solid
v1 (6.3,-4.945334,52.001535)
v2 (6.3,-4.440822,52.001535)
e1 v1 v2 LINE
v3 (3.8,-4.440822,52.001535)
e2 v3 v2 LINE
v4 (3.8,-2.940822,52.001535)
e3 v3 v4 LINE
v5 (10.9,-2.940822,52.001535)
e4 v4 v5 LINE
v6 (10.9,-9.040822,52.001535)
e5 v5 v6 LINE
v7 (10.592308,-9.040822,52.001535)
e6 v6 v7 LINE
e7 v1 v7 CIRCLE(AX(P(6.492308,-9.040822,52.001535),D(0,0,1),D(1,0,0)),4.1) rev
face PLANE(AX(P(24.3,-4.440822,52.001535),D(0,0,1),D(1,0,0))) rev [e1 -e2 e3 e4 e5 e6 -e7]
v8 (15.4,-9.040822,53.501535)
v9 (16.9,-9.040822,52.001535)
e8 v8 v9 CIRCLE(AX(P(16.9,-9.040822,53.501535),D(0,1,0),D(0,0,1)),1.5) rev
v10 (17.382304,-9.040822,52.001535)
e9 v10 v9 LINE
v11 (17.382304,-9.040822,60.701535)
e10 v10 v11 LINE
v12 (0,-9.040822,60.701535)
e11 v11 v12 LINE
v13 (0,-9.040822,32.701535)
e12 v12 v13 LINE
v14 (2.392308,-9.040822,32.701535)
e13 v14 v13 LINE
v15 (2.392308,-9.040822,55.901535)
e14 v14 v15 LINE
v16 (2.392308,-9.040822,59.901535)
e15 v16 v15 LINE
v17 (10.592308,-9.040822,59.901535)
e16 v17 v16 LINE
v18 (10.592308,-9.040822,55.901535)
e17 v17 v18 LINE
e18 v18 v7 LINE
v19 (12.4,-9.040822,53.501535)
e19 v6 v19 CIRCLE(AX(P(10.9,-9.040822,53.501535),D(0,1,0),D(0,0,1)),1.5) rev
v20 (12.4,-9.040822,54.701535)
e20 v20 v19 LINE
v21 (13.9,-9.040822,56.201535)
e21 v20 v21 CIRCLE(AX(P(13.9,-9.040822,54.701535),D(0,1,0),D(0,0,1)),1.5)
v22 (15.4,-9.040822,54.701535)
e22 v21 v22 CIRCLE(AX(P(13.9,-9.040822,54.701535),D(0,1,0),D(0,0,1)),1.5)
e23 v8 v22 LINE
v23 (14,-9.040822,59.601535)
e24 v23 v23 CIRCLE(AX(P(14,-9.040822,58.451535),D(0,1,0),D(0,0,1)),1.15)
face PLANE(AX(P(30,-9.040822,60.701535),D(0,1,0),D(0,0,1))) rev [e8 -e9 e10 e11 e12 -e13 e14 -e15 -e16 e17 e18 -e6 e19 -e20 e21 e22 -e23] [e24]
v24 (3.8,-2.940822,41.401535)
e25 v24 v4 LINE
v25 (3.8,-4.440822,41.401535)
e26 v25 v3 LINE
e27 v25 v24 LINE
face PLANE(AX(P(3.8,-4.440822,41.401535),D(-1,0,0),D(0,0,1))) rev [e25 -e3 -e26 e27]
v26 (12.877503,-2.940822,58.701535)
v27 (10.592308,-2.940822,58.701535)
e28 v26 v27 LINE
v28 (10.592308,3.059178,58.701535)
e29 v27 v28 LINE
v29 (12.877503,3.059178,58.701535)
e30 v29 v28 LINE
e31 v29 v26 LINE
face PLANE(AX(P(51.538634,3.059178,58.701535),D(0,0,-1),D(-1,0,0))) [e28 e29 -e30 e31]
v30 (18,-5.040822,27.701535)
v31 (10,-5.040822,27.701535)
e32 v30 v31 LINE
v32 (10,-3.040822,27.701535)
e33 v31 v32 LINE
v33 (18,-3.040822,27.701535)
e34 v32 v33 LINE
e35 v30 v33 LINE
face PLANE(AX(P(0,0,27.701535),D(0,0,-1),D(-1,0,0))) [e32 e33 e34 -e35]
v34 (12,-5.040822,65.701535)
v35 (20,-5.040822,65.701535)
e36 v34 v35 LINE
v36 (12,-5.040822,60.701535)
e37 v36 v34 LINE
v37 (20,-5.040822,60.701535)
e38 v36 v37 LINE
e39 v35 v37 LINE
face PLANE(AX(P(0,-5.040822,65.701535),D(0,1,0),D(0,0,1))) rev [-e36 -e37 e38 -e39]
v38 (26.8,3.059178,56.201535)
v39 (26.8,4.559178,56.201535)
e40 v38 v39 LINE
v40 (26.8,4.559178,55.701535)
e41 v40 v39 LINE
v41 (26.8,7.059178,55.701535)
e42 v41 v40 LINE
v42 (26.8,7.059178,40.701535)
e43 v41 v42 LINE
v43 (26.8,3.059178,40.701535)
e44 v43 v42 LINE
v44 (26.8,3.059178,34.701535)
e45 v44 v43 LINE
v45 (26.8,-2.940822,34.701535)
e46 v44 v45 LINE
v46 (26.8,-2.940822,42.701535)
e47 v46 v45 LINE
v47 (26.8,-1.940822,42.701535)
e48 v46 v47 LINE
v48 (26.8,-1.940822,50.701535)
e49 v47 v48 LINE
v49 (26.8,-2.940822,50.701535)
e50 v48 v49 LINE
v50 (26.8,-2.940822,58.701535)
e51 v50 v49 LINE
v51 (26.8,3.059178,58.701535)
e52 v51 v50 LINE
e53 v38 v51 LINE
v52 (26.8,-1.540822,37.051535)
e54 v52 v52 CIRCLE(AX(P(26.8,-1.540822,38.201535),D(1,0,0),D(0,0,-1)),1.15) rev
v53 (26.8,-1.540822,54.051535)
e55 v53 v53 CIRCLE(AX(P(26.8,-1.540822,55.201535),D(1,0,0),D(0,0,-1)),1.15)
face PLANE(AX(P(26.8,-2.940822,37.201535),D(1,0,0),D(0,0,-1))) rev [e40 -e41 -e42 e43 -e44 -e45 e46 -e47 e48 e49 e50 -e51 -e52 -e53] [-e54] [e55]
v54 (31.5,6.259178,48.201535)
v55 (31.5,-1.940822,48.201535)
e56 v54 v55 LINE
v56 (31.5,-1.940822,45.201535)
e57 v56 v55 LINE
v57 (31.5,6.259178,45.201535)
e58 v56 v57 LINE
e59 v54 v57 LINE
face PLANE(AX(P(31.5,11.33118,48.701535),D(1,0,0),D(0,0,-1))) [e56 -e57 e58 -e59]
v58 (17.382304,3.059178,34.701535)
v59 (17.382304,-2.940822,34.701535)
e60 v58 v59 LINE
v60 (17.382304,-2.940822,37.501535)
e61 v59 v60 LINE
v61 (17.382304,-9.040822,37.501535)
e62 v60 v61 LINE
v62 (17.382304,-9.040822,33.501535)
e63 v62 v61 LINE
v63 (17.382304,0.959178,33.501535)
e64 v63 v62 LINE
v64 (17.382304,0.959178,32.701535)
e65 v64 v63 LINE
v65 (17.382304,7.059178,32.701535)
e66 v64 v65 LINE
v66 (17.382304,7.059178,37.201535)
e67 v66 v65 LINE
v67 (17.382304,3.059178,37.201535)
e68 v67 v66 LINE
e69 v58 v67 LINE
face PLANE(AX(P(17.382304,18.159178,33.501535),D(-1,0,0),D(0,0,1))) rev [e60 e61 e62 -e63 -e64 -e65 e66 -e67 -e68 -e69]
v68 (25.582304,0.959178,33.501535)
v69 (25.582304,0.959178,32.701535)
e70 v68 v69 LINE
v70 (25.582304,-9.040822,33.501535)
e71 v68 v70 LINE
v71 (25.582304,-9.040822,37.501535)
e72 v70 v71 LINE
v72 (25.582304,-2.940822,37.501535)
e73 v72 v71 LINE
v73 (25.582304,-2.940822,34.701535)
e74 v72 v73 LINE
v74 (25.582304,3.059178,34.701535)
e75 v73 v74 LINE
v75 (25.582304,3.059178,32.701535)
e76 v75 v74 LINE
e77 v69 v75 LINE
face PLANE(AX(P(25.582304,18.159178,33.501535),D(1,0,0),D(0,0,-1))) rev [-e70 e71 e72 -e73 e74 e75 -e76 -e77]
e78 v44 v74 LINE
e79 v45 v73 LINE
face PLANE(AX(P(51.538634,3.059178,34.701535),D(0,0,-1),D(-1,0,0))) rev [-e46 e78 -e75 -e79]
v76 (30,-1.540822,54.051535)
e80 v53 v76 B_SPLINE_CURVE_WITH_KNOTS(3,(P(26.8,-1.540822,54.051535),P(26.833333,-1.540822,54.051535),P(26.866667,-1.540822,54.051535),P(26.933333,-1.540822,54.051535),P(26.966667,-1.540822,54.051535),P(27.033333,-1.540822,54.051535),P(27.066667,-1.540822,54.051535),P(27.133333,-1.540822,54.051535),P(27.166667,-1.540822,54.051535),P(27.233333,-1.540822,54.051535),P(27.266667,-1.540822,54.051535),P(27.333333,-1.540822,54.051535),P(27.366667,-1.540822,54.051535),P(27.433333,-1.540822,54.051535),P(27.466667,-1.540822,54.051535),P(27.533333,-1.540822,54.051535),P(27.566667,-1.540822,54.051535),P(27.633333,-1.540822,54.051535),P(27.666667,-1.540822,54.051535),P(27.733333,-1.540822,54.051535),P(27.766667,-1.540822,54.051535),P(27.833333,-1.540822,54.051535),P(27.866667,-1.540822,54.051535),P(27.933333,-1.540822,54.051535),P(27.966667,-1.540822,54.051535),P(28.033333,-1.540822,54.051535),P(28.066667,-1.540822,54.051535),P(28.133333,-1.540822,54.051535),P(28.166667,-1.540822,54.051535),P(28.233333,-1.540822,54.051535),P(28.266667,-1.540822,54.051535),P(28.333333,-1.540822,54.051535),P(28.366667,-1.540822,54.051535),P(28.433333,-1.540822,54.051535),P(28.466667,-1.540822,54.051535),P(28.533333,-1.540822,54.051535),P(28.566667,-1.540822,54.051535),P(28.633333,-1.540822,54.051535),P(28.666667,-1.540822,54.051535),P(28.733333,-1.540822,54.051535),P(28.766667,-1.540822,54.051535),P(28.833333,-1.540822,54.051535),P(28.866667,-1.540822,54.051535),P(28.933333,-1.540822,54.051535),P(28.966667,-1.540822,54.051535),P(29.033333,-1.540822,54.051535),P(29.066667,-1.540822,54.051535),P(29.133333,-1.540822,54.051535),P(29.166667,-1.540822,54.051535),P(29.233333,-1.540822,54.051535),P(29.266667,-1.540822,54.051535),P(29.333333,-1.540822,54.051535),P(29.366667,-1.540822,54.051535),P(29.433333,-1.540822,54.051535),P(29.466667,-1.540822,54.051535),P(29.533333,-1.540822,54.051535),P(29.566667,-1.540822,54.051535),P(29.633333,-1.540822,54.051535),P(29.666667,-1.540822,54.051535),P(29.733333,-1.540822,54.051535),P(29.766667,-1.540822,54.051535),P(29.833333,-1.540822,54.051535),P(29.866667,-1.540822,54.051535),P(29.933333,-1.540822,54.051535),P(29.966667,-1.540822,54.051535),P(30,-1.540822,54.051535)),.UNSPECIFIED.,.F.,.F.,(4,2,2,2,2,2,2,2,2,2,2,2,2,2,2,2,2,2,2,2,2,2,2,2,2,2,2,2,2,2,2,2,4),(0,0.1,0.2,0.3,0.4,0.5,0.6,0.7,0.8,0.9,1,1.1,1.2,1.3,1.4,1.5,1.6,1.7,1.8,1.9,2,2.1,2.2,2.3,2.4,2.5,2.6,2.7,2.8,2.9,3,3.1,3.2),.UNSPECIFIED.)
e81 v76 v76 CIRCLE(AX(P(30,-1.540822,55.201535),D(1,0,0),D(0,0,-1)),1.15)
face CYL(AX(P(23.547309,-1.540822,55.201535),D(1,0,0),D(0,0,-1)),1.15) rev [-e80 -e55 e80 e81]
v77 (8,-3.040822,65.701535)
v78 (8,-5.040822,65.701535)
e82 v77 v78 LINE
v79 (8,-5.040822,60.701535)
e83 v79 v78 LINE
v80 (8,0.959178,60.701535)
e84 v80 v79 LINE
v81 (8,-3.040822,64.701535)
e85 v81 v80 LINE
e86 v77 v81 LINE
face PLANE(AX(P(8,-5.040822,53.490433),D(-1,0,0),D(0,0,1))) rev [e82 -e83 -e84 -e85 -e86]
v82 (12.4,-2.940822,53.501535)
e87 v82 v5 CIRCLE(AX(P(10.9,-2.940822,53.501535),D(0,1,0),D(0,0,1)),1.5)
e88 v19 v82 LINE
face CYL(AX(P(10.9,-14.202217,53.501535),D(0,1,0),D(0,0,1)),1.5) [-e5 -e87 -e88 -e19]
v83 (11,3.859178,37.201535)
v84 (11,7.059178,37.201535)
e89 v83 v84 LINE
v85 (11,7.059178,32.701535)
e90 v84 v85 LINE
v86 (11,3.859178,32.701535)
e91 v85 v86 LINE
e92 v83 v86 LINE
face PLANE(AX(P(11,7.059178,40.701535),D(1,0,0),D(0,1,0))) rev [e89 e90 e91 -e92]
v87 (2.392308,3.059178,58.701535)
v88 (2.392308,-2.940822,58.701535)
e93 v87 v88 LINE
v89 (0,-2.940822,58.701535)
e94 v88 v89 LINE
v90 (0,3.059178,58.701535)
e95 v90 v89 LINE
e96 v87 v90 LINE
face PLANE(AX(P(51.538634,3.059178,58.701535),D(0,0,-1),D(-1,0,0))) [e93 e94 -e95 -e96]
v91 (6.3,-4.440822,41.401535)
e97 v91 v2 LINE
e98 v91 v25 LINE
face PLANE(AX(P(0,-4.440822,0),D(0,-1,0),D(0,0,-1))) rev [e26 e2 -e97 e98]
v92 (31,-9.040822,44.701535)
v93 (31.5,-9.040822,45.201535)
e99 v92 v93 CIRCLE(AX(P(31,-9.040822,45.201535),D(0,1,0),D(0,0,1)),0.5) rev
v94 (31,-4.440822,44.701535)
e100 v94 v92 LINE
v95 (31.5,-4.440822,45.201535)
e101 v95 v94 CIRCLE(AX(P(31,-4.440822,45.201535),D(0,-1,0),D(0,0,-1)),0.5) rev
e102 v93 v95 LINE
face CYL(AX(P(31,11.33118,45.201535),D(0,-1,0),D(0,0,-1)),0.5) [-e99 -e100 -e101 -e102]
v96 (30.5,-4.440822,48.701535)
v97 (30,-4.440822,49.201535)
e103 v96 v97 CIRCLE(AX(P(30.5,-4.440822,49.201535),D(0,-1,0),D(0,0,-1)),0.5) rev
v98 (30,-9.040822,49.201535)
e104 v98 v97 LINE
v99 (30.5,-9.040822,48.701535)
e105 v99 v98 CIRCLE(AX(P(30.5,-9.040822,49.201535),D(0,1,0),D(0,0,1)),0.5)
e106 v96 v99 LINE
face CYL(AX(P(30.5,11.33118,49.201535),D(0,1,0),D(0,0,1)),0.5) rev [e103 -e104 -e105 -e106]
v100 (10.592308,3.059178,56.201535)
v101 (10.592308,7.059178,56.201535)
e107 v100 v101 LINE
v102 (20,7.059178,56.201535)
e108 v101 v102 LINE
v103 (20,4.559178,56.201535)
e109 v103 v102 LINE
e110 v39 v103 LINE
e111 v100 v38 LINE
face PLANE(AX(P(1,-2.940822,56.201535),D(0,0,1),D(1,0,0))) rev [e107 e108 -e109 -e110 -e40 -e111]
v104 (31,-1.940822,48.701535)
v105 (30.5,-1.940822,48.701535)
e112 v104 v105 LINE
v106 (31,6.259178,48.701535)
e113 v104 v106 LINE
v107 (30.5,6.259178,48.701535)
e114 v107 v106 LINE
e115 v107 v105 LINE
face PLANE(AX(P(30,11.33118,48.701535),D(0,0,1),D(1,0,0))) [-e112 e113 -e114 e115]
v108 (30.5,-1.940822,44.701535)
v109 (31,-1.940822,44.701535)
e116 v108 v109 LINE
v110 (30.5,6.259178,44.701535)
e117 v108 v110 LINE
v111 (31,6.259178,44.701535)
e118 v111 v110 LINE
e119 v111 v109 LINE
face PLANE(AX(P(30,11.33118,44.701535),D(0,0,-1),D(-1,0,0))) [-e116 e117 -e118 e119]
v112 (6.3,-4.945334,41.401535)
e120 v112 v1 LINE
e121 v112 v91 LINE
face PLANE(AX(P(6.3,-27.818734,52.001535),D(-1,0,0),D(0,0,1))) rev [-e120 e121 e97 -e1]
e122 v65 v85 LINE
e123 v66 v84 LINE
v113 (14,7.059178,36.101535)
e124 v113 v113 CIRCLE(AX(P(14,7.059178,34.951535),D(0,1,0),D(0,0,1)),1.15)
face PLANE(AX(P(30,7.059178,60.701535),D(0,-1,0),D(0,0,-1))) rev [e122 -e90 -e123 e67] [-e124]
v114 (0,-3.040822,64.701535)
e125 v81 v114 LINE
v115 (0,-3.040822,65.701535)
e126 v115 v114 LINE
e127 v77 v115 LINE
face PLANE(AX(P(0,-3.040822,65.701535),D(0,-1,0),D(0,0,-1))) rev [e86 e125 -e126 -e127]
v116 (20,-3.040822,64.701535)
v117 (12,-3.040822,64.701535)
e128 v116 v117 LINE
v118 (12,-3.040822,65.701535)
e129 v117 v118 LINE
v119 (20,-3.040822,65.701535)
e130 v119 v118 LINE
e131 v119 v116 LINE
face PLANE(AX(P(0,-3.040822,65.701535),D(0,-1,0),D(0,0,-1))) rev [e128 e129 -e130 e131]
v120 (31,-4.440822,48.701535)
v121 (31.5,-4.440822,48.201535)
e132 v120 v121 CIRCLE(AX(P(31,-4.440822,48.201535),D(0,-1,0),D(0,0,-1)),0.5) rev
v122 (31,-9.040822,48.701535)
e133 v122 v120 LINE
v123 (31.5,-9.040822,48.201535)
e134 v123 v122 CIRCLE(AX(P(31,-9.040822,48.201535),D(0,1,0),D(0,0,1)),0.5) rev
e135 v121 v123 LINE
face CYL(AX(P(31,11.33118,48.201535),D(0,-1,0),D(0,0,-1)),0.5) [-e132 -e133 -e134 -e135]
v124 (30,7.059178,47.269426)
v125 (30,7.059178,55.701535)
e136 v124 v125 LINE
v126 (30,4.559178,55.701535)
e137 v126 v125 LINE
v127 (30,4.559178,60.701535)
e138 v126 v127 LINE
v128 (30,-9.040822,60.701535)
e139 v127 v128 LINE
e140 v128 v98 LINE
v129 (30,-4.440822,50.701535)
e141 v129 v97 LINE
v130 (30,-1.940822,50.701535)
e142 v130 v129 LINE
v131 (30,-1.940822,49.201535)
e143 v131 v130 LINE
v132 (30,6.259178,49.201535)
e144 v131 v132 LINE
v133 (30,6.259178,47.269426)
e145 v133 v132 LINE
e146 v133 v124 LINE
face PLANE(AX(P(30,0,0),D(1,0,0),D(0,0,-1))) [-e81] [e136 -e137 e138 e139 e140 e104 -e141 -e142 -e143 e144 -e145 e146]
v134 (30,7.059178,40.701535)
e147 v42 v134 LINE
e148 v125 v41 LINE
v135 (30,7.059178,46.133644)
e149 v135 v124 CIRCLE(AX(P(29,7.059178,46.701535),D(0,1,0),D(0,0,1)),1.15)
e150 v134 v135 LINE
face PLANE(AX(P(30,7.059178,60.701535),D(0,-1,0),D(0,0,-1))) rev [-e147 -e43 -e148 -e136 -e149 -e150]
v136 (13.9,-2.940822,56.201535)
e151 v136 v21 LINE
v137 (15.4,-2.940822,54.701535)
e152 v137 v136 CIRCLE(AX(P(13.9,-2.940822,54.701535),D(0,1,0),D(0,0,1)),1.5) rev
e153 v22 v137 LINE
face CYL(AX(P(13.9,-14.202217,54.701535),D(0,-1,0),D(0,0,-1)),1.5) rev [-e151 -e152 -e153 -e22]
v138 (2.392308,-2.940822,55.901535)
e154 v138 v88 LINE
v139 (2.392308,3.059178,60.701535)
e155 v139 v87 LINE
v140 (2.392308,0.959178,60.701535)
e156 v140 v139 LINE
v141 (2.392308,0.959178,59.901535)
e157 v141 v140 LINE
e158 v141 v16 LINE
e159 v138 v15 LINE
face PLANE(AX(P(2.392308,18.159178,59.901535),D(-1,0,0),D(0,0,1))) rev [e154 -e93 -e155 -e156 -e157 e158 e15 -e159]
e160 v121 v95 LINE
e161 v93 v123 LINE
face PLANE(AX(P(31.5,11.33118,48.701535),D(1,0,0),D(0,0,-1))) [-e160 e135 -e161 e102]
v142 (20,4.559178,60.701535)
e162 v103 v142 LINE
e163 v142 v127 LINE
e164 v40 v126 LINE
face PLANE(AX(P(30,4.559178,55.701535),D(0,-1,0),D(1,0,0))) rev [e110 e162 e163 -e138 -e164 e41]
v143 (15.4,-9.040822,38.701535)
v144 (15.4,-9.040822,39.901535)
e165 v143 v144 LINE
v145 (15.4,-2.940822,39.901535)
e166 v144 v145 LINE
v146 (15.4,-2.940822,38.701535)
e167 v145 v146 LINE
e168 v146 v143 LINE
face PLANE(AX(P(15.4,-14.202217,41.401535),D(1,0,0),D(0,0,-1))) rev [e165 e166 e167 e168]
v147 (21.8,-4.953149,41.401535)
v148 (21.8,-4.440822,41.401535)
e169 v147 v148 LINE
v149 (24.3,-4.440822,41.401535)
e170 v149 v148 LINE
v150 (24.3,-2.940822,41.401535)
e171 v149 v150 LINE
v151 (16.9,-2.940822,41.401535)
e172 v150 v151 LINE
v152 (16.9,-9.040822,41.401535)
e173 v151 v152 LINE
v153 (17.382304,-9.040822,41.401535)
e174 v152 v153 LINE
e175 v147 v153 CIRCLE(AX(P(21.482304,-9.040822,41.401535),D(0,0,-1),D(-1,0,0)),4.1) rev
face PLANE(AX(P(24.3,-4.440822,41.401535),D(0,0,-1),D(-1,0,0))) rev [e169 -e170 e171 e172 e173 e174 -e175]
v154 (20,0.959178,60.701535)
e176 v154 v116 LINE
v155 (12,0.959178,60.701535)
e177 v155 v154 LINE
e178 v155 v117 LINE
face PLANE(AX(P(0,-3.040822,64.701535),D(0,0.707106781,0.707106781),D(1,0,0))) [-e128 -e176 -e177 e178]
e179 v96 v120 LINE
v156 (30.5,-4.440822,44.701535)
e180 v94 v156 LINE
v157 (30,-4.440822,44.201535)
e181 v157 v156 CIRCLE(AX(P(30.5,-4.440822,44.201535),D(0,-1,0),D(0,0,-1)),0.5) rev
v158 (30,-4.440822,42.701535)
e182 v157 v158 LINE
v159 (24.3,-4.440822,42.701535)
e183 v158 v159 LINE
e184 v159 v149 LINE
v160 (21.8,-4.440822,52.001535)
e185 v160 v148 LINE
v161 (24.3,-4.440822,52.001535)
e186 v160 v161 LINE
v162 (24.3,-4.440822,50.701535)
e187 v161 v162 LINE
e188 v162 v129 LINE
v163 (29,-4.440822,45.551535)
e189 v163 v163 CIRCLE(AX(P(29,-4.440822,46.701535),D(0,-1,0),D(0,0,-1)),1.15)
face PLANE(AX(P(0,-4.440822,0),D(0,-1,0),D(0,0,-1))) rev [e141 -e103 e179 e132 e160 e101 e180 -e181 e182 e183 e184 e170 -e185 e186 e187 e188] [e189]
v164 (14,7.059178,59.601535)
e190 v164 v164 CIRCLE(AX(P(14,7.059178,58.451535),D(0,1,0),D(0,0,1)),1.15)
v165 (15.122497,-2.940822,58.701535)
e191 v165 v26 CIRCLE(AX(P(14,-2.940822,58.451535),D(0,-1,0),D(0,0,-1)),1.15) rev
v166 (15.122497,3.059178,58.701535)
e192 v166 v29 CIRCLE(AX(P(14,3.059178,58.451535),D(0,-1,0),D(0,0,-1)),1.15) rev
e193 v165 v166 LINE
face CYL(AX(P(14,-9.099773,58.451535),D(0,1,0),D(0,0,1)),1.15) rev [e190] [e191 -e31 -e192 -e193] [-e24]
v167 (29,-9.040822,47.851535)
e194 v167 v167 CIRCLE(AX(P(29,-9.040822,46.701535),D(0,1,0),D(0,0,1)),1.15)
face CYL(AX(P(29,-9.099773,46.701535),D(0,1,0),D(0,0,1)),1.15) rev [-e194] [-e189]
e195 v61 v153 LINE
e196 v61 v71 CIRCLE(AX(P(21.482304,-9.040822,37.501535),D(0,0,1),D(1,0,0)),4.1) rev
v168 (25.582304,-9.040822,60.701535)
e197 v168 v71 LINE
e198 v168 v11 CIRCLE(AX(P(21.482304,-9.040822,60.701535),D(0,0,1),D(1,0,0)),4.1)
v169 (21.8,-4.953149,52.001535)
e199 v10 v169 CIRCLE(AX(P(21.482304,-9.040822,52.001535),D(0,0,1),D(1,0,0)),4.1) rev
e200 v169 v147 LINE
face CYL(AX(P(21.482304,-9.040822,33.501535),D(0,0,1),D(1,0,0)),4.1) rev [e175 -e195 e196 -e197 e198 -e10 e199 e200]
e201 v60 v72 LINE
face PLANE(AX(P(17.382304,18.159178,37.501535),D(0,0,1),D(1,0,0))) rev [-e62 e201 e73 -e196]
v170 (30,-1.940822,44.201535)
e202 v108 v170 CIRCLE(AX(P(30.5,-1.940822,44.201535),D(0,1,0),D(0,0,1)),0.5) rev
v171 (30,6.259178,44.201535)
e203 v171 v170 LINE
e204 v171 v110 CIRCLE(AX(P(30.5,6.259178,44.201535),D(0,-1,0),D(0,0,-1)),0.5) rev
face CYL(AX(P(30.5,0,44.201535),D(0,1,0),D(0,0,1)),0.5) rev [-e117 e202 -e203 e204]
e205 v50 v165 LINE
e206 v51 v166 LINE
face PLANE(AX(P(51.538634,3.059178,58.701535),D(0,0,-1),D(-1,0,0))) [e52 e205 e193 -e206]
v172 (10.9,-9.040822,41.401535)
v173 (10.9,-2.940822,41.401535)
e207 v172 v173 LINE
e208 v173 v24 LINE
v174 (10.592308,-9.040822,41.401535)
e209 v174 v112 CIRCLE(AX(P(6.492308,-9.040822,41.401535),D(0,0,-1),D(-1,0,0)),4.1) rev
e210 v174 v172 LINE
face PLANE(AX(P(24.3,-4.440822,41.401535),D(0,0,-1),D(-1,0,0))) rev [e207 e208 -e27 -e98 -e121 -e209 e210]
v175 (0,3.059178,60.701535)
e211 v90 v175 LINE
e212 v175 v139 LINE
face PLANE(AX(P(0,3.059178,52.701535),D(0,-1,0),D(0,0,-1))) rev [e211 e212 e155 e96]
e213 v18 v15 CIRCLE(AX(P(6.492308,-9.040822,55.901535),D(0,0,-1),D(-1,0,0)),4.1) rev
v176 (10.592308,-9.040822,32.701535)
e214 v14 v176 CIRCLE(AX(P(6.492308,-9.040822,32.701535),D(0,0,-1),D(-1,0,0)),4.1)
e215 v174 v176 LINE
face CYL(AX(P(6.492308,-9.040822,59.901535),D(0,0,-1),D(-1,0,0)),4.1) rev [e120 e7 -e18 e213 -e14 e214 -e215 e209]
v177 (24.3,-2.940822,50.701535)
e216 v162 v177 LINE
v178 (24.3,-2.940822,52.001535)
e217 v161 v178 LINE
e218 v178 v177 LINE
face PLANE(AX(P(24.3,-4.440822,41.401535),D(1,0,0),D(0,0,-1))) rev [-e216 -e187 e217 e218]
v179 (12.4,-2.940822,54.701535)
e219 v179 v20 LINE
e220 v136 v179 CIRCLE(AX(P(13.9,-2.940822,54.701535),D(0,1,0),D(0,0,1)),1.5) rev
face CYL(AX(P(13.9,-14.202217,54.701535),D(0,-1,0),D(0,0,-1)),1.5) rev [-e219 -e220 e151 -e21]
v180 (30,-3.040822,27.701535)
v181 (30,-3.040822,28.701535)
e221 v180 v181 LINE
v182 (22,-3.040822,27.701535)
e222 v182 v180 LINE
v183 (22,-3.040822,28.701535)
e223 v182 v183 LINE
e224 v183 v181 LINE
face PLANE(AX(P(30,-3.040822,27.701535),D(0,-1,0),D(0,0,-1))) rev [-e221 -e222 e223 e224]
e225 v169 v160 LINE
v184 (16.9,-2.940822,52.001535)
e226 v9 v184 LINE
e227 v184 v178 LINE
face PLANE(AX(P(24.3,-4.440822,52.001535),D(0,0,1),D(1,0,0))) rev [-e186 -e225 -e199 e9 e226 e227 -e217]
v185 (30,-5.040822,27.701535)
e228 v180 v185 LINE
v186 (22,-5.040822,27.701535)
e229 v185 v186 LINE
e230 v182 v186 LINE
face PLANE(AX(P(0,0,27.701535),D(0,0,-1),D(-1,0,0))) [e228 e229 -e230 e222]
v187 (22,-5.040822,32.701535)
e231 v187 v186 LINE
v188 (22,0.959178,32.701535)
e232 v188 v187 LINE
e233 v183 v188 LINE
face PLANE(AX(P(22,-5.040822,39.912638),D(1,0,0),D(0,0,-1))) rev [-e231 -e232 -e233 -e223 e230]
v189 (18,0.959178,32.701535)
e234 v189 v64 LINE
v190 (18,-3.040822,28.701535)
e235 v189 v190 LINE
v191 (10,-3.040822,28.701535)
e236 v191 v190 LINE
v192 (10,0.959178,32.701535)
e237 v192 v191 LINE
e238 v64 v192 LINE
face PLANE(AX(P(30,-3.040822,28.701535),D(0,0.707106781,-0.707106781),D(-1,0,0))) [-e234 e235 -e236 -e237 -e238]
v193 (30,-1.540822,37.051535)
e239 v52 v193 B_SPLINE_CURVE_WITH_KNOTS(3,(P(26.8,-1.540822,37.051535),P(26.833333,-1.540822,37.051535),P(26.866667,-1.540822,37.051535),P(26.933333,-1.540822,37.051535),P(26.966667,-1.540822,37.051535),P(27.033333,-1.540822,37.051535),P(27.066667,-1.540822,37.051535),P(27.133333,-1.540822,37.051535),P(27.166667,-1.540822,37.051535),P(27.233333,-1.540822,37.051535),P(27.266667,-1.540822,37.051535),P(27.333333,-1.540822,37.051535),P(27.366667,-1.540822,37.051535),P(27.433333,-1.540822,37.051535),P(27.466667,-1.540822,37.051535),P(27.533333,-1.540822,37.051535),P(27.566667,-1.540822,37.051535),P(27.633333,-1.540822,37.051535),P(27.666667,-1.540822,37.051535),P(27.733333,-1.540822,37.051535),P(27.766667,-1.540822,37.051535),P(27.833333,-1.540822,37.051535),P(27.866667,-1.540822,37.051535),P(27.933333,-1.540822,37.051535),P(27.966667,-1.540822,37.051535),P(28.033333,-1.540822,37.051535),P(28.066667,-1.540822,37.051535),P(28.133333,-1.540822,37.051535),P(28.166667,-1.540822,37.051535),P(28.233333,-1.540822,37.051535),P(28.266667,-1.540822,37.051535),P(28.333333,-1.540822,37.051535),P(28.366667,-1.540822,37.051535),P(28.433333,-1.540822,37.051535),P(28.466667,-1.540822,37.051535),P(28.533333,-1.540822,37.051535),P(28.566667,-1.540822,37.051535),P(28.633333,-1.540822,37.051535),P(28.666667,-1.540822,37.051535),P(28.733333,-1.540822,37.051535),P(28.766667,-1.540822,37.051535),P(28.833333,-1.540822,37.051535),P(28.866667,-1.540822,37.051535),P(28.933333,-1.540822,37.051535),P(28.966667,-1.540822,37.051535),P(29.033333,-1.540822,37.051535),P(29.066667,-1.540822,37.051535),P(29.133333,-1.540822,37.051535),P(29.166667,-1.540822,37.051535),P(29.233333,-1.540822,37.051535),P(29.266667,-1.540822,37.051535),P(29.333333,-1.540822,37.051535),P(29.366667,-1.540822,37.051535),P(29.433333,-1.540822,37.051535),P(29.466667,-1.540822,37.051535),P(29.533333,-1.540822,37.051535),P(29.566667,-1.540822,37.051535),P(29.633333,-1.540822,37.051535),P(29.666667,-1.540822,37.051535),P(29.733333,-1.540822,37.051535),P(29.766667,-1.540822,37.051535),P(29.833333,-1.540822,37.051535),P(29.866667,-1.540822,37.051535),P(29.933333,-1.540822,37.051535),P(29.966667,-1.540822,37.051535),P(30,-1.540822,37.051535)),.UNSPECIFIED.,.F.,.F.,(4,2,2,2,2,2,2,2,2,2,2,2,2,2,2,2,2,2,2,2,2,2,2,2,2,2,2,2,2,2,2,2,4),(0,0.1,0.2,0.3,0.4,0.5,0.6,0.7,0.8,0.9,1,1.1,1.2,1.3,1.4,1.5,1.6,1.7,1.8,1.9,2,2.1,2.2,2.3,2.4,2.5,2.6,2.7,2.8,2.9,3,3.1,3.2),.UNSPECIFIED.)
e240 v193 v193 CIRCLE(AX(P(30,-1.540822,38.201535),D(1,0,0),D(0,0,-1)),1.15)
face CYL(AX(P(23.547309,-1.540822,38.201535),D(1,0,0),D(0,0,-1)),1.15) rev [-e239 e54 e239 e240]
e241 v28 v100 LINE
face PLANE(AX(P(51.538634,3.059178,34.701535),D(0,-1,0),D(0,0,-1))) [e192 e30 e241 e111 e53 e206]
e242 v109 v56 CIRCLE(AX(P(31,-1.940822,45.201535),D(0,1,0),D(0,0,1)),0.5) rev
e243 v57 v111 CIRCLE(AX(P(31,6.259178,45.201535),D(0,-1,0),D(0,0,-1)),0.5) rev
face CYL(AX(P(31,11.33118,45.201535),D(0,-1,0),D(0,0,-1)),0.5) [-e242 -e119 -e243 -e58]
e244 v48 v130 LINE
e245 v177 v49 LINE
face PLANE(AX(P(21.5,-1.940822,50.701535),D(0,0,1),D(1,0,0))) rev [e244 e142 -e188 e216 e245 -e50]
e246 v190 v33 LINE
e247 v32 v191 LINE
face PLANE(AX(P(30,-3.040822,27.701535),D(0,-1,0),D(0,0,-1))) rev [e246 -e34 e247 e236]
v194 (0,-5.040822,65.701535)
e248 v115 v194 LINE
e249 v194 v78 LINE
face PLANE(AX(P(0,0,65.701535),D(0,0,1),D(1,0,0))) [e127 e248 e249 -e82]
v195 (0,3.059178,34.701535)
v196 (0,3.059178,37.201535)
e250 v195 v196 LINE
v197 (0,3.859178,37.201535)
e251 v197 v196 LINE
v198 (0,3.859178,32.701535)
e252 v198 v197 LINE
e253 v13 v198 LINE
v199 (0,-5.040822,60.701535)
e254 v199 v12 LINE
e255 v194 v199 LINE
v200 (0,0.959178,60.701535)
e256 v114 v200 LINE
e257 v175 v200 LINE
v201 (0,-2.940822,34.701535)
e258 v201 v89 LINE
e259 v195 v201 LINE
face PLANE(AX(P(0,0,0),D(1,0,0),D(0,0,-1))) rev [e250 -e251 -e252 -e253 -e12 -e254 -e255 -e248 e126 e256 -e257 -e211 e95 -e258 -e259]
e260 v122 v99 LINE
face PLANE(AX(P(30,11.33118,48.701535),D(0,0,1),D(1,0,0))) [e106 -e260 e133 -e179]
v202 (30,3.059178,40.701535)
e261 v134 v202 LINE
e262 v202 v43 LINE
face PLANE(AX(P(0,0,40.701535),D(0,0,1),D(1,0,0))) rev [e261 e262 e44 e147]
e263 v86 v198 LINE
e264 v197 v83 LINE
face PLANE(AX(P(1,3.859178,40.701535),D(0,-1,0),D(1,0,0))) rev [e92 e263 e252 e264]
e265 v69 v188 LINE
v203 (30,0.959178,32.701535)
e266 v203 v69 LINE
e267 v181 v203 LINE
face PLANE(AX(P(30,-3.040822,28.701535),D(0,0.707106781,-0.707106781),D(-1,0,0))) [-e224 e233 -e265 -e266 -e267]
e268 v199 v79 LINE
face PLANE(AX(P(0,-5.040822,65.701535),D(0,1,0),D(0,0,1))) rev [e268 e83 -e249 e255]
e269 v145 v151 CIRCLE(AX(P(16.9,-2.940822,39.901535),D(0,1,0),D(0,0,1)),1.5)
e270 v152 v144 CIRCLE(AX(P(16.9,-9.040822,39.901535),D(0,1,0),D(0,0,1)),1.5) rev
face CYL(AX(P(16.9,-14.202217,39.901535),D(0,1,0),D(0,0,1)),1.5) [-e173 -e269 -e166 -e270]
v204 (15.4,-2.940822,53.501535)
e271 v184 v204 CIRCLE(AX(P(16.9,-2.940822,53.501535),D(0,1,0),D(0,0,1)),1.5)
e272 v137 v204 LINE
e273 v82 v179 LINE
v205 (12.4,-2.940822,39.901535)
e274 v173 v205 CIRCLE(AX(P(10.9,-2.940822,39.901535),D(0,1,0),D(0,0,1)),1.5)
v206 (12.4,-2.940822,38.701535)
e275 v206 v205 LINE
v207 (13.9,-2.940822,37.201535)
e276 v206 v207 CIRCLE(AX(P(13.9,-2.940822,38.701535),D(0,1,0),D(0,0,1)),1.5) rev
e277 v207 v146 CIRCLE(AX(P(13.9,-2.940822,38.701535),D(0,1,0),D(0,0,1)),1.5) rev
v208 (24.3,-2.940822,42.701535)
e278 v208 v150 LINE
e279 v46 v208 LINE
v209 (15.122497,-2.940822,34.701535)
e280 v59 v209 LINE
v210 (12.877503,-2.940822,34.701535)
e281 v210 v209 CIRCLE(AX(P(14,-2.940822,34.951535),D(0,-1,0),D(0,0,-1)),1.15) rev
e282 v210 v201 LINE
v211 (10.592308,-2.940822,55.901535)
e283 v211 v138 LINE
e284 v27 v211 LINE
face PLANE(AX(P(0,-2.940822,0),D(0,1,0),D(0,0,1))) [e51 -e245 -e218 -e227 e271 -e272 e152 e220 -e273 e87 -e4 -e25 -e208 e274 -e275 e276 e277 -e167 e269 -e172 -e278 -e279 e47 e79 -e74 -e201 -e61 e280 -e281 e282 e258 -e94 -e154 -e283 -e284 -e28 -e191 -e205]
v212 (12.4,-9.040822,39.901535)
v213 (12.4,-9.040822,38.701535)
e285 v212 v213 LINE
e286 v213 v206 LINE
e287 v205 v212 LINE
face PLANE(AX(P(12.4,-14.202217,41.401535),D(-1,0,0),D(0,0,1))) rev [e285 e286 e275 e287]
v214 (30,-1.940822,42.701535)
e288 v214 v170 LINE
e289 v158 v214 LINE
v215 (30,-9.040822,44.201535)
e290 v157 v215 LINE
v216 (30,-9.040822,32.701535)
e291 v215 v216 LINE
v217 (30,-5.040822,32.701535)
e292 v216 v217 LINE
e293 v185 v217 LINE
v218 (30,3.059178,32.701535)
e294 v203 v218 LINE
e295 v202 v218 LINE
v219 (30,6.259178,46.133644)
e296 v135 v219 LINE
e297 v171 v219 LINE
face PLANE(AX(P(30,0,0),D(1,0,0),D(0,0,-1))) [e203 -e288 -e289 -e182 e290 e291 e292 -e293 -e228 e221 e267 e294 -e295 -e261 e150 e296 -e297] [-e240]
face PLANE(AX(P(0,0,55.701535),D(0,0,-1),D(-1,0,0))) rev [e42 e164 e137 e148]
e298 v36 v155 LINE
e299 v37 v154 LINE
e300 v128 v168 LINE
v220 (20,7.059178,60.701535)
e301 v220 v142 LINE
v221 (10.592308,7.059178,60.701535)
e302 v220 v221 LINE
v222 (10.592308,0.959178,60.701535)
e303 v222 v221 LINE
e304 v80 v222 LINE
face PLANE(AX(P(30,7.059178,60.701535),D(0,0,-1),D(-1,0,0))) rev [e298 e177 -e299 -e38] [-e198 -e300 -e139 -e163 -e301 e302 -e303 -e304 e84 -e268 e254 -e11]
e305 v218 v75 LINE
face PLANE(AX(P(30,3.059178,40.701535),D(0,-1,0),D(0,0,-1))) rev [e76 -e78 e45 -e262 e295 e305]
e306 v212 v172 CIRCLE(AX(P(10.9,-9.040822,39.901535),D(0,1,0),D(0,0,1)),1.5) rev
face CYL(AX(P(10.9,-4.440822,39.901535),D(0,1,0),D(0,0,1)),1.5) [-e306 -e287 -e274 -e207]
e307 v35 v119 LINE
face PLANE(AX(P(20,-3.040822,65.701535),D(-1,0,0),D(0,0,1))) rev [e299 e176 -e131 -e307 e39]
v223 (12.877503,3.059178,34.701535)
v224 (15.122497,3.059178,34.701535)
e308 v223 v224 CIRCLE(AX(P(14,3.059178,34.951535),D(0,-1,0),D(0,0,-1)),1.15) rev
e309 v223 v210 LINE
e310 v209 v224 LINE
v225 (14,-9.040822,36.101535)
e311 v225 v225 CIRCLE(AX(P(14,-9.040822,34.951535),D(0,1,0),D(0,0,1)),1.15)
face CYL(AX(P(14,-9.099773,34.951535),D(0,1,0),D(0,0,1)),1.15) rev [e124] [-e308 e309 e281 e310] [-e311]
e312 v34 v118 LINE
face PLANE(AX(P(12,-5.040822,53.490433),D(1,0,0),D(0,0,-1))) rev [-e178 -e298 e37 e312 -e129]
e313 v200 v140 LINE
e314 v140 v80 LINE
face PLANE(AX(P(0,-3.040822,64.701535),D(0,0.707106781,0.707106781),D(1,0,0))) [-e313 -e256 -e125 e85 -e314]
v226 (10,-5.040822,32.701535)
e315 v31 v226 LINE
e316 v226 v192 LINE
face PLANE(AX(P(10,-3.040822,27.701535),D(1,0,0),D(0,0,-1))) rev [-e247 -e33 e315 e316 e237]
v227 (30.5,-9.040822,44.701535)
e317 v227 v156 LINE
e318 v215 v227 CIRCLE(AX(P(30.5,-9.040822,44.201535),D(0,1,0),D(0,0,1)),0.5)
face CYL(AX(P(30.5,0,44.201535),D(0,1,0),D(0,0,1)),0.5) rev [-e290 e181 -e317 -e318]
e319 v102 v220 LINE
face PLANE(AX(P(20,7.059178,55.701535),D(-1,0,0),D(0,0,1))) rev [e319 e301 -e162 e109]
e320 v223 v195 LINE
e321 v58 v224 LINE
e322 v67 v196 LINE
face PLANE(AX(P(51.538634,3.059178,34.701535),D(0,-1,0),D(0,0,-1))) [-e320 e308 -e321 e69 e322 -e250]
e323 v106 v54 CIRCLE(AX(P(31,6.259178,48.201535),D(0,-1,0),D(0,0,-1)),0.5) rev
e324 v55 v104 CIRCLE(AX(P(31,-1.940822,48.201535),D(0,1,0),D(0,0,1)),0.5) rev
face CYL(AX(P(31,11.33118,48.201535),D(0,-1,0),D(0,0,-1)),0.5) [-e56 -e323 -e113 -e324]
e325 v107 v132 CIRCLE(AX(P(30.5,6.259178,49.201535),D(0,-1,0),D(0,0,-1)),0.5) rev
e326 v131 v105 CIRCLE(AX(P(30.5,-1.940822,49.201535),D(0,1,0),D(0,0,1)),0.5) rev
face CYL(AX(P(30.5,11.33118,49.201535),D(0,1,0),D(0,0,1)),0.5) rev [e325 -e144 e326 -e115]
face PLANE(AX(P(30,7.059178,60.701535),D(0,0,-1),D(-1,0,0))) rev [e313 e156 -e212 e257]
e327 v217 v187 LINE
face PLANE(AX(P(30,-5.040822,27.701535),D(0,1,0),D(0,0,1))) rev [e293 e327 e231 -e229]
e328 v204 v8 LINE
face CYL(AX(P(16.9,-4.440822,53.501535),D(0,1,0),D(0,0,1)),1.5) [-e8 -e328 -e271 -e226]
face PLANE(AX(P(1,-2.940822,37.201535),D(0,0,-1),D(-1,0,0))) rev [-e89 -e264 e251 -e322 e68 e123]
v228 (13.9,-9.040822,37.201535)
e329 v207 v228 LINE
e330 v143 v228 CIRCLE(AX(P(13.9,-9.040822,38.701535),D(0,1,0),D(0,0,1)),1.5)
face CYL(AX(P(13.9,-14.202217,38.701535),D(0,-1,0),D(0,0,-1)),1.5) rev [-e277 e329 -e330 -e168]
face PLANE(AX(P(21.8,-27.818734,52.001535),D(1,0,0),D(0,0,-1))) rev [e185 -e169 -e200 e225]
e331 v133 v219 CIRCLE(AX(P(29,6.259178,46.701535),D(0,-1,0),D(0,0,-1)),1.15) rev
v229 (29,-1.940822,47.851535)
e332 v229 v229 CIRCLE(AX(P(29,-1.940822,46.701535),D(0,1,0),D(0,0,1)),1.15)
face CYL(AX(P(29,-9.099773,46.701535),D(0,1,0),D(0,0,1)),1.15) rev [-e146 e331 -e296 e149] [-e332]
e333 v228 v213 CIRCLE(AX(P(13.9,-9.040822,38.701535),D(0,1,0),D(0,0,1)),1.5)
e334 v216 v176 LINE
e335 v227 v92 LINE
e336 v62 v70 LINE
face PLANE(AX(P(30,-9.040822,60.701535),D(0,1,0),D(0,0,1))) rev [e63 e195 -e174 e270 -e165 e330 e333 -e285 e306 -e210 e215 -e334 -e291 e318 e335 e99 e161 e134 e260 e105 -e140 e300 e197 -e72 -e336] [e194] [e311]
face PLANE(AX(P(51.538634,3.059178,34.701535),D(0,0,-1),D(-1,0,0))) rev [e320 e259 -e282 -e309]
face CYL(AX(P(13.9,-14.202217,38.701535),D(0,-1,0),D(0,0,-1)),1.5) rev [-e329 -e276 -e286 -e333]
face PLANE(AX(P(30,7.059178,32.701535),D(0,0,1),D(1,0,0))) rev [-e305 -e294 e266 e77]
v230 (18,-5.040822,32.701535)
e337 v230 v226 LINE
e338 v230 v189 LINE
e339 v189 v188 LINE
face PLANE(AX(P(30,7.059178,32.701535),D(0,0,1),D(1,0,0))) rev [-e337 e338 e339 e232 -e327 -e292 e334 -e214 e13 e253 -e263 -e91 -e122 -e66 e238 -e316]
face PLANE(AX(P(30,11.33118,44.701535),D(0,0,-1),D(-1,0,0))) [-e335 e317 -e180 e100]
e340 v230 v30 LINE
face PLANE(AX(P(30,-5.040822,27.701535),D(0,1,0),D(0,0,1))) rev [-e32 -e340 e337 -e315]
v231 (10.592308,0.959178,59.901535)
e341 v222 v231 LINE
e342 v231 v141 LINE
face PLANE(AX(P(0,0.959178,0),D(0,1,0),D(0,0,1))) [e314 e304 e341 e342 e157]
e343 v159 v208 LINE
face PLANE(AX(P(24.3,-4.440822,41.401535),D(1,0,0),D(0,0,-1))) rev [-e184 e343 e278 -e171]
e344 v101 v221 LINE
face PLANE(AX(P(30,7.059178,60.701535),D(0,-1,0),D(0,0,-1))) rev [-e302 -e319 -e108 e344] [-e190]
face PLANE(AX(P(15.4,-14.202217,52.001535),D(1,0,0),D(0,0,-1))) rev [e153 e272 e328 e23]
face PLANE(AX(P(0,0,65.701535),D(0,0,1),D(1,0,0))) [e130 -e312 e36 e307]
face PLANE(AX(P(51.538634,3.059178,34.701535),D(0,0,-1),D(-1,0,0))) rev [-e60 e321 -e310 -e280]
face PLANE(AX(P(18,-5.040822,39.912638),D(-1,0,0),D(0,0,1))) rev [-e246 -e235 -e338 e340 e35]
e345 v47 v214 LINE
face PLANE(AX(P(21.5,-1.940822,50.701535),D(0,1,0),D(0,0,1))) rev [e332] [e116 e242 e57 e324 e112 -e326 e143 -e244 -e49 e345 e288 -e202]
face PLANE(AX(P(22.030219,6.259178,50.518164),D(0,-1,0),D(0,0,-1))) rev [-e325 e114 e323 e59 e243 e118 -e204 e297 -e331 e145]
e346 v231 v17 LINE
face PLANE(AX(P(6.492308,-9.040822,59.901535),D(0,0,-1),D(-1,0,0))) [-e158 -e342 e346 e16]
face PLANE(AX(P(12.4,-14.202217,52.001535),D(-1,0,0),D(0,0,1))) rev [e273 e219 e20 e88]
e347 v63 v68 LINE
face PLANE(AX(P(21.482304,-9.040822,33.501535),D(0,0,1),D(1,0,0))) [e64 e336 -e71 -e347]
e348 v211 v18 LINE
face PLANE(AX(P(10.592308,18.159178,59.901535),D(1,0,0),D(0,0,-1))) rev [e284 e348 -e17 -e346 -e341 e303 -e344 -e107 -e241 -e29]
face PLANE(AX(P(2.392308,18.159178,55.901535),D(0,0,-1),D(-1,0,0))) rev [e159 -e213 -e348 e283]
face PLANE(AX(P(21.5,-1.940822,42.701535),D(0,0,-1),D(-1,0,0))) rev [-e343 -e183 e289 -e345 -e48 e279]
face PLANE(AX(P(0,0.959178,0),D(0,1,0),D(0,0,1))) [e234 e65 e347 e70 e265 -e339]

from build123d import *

# Parameters (mm, degrees)
SKETCH1_W           = 28
SKETCH1_H           = 16.1
BOSS_EXTRUDE1_DEPTH = 30
SKETCH2_W           = 10
SKETCH2_H           = 2.5
CUT_EXTRUDE1_DEPTH  = 5
SKETCH3_W           = 10
SKETCH3_H           = 4
CUT_EXTRUDE2_DEPTH  = 8
SKETCH4_W           = 10
SKETCH4_H           = 3.2
CUT_EXTRUDE3_DEPTH  = 8
SKETCH5_W           = 11
SKETCH5_H           = 4
CUT_EXTRUDE4_DEPTH  = 8
SKETCH6_W           = 20
SKETCH6_H           = 2
BOSS_EXTRUDE2_DEPTH = 5
CHAMFER1_SIZE       = 4
SKETCH7_W           = 20
SKETCH7_H           = 2
BOSS_EXTRUDE3_DEPTH = 5
CHAMFER2_SIZE       = 4
SKETCH9_W           = 25.8
SKETCH9_H           = 19
CUT_EXTRUDE6_DEPTH  = 10
SKETCH13_R          = 4.1
CUT_EXTRUDE10_DEPTH = 27.2
SKETCH14_R          = 4.1
CUT_EXTRUDE11_DEPTH = 27.2
SKETCH15_W          = 8.2
SKETCH15_H          = 4
CUT_EXTRUDE12_DEPTH = 27.2
SKETCH16_W          = 0.59230819
SKETCH16_H          = 0.8
SKETCH16_W_2        = 1.617695922
CUT_EXTRUDE13_DEPTH = 4
SKETCH17_W          = 1.5
SKETCH17_H          = 4
BOSS_EXTRUDE4_DEPTH = 16.1
FILLET1_R           = 0.5
SKETCH18_R          = 3.5
CUT_EXTRUDE14_DEPTH = 6.1
SKETCH19_W          = 8
SKETCH19_H          = 1
CUT_EXTRUDE15_DEPTH = 10
SKETCH20_W          = 20.5
SKETCH20_H          = 10.6
CUT_EXTRUDE16_DEPTH = 1.5
SKETCH21_W          = 5.7
SKETCH21_H          = 8
CUT_EXTRUDE17_DEPTH = 1.5
SKETCH22_W          = 8
SKETCH22_H          = 2.5
CUT_EXTRUDE18_DEPTH = 1.5
SKETCH23_R          = 1.15
CUT_EXTRUDE19_DEPTH = 75.620049118
SKETCH24_W          = 8.2
SKETCH24_H          = 0.8
CUT_EXTRUDE20_DEPTH = 2.1
CUT_EXTRUDE21_REACH = 75.421
SKETCH25_W          = 7.929527271
SKETCH25_H          = 0.8
CUT_EXTRUDE22_START = -5
SKETCH26_W          = 4
SKETCH26_H          = 6
CUT_EXTRUDE22_DEPTH = 5
CUT_EXTRUDE23_START = -5
SKETCH27_W          = 4
SKETCH27_H          = 6
CUT_EXTRUDE23_DEPTH = 5
SKETCH28_R          = 1.15
CUT_EXTRUDE24_DEPTH = 3.2
CUT_EXTRUDE25_REACH = 75.764
SKETCH29_W          = 15.5
SKETCH29_H          = 10.6
CUT_EXTRUDE27_REACH = 75.421
SKETCH30_W          = 24
SKETCH30_H          = 6
CUT_EXTRUDE29_DEPTH = 1
SKETCH33_W          = 3
SKETCH33_H          = 4.2
CUT_EXTRUDE30_DEPTH = 6.1
FILLET2_START       = -9.040821865
FILLET2_DEPTH       = 6.1
FILLET2_2_DEPTH     = 6.1


with BuildPart() as part:
    # Sketch1 → Boss-Extrude1 (new body)
    with BuildSketch(Plane(origin=(0, 0, 0), x_dir=(0, 0, -1), z_dir=(1, 0, 0))):
        with Locations((-46.701535197, -0.990821865)):
            Rectangle(SKETCH1_W, SKETCH1_H)
    extrude(amount=BOSS_EXTRUDE1_DEPTH)

    # Sketch2 → Cut-Extrude1 (cut)
    with BuildSketch(Plane.XY.offset(60.701535197)):
        with Locations((25, 5.809178135)):
            Rectangle(SKETCH2_W, SKETCH2_H)
    extrude(amount=-CUT_EXTRUDE1_DEPTH, mode=Mode.SUBTRACT)

    # Sketch3 → Cut-Extrude2 (cut)
    with BuildSketch(Plane.XY.offset(60.701535197)):
        with Locations((5, 5.059178135)):
            Rectangle(SKETCH3_W, SKETCH3_H)
    extrude(amount=-CUT_EXTRUDE2_DEPTH, mode=Mode.SUBTRACT)

    # Sketch4 → Cut-Extrude3 (cut)
    with BuildSketch(Plane(origin=(0, 0, 32.701535197), x_dir=(-1, 0, 0), z_dir=(0, 0, -1))):
        with Locations((-6, 5.459178135)):
            Rectangle(SKETCH4_W, SKETCH4_H)
    extrude(amount=-CUT_EXTRUDE3_DEPTH, mode=Mode.SUBTRACT)

    # Sketch5 → Cut-Extrude4 (cut)
    with BuildSketch(Plane(origin=(0, 0, 32.701535197), x_dir=(-1, 0, 0), z_dir=(0, 0, -1))):
        with Locations((-24.5, 5.059178135)):
            Rectangle(SKETCH5_W, SKETCH5_H)
    extrude(amount=-CUT_EXTRUDE4_DEPTH, mode=Mode.SUBTRACT)

    # Sketch6 → Boss-Extrude2 (add)
    with BuildSketch(Plane(origin=(0, 0, 32.701535197), x_dir=(-1, 0, 0), z_dir=(0, 0, -1))):
        with Locations((-20, -4.040821865)):
            Rectangle(SKETCH6_W, SKETCH6_H)
    extrude(amount=BOSS_EXTRUDE2_DEPTH)

    # Chamfer1
    chamfer1_edges = [part.edges().sort_by_distance(p)[0] for p in [
        (20, -3.040821865, 32.701535197),
    ]]
    chamfer(chamfer1_edges, length=CHAMFER1_SIZE)

    # Sketch7 → Boss-Extrude3 (add)
    with BuildSketch(Plane.XY.offset(60.701535197)):
        with Locations((10, -4.040821865)):
            Rectangle(SKETCH7_W, SKETCH7_H)
    extrude(amount=BOSS_EXTRUDE3_DEPTH)

    # Chamfer2
    chamfer2_edges = [part.edges().sort_by_distance(p)[0] for p in [
        (10, -3.040821865, 60.701535197),
    ]]
    chamfer(chamfer2_edges, length=CHAMFER2_SIZE)

    # Sketch9 → Cut-Extrude6 (cut)
    with BuildSketch(Plane(origin=(0, 7.059178135, 0), x_dir=(1, 0, 0), z_dir=(0, 1, 0))):
        with Locations((13.9, -46.701535197)):
            Rectangle(SKETCH9_W, SKETCH9_H)
    extrude(amount=-CUT_EXTRUDE6_DEPTH, mode=Mode.SUBTRACT)

    # Sketch13 → Cut-Extrude10 (cut)
    with BuildSketch(Plane.XY.offset(60.701535197)):
        with Locations((21.482304078, -9.040821865)):
            Circle(SKETCH13_R)
    extrude(amount=-CUT_EXTRUDE10_DEPTH, mode=Mode.SUBTRACT)

    # Sketch14 → Cut-Extrude11 (cut)
    with BuildSketch(Plane(origin=(0, 0, 32.701535197), x_dir=(-1, 0, 0), z_dir=(0, 0, -1))):
        with Locations((-6.49230819, -9.040821865)):
            Circle(SKETCH14_R)
    extrude(amount=-CUT_EXTRUDE11_DEPTH, mode=Mode.SUBTRACT)

    # Sketch15 → Cut-Extrude12 (cut)
    with BuildSketch(Plane.XZ.offset(9.040821865)):
        with Locations((6.49230819, 57.901535197)):
            Rectangle(SKETCH15_W, SKETCH15_H)
        with Locations((21.482304078, 35.501535197)):
            Rectangle(SKETCH15_W, SKETCH15_H)
    extrude(amount=-CUT_EXTRUDE12_DEPTH, mode=Mode.SUBTRACT)

    # Sketch16 → Cut-Extrude13 (cut)
    with BuildSketch(Plane(origin=(0, 7.059178135, 0), x_dir=(1, 0, 0), z_dir=(0, 1, 0))):
        with Locations((10.296154095, -60.301535197)):
            Rectangle(SKETCH16_W, SKETCH16_H)
        with Locations((18.191152039, -33.101535197)):
            Rectangle(SKETCH16_W_2, SKETCH16_H)
    extrude(amount=-CUT_EXTRUDE13_DEPTH, mode=Mode.SUBTRACT)

    # Sketch17 → Boss-Extrude4 (add)
    with BuildSketch(Plane.XZ.offset(9.040821865)):
        with Locations((30.75, 46.701535197)):
            Rectangle(SKETCH17_W, SKETCH17_H)
    extrude(amount=-BOSS_EXTRUDE4_DEPTH)

    # Fillet1
    fillet1_edges = [part.edges().sort_by_distance(p)[0] for p in [
        (30, -0.990821865, 44.701535197),
        (30, -0.990821865, 48.701535197),
        (31.5, -0.990821865, 48.701535197),
        (31.5, -0.990821865, 44.701535197),
    ]]
    fillet(fillet1_edges, radius=FILLET1_R)

    # Sketch18 → Cut-Extrude14 (cut)
    with BuildSketch(Plane.XZ.offset(9.040821865)):
        with Locations(Location((13.985, 46.701535197, 0), (0, 0, 194.224464848))):
            Circle(SKETCH18_R)
    extrude(amount=-CUT_EXTRUDE14_DEPTH, mode=Mode.SUBTRACT)

    # Sketch19 → Cut-Extrude15 (cut)
    with BuildSketch(Plane(origin=(31.5, 0, 0), x_dir=(0, 0, -1), z_dir=(1, 0, 0))):
        with Locations((-46.701535197, -2.440821865)):
            Rectangle(SKETCH19_W, SKETCH19_H)
    extrude(amount=-CUT_EXTRUDE15_DEPTH, mode=Mode.SUBTRACT)

    # Sketch20 → Cut-Extrude16 (cut)
    with BuildSketch(Plane(origin=(0, -2.940821865, 0), x_dir=(1, 0, 0), z_dir=(0, 1, 0))):
        with Locations((14.05, -46.701535197)):
            Rectangle(SKETCH20_W, SKETCH20_H)
    extrude(amount=-CUT_EXTRUDE16_DEPTH, mode=Mode.SUBTRACT)

    # Sketch21 → Cut-Extrude17 (cut)
    with BuildSketch(Plane(origin=(0, -2.940821865, 0), x_dir=(1, 0, 0), z_dir=(0, 1, 0))):
        with Locations((27.15, -46.701535197)):
            Rectangle(SKETCH21_W, SKETCH21_H)
    extrude(amount=-CUT_EXTRUDE17_DEPTH, mode=Mode.SUBTRACT)

    # Sketch22 → Cut-Extrude18 (cut)
    with BuildSketch(Plane(origin=(31.5, 0, 0), x_dir=(0, 0, -1), z_dir=(1, 0, 0))):
        with Locations((-46.701535197, -3.190821865)):
            Rectangle(SKETCH22_W, SKETCH22_H)
    extrude(amount=-CUT_EXTRUDE18_DEPTH, mode=Mode.SUBTRACT)

    # Sketch23 → Cut-Extrude19 (cut, through all)
    with BuildSketch(Plane(origin=(0, 7.059178135, 0), x_dir=(1, 0, 0), z_dir=(0, 1, 0))):
        with Locations(Location((29, -46.701535197, 0), (0, 0, 270))):
            Circle(SKETCH23_R)
        with Locations(Location((14, -34.951535197, 0), (0, 0, 270))):
            Circle(SKETCH23_R)
        with Locations(Location((14, -58.451535197, 0), (0, 0, 270))):
            Circle(SKETCH23_R)
    extrude(amount=-CUT_EXTRUDE19_DEPTH, mode=Mode.SUBTRACT)

    # Sketch24 → Cut-Extrude20 (cut)
    with BuildSketch(Plane(origin=(0, 3.059178135, 0), x_dir=(1, 0, 0), z_dir=(0, 1, 0))):
        with Locations((21.482304078, -33.101535197)):
            Rectangle(SKETCH24_W, SKETCH24_H)
        with Locations((6.49230819, -60.301535197)):
            Rectangle(SKETCH24_W, SKETCH24_H)
    extrude(amount=-CUT_EXTRUDE20_DEPTH, mode=Mode.SUBTRACT)

    # Cut-Extrude21: up to this face of the body (flat: up to its plane)
    cut_extrude21_end = Plane(part.part.faces().sort_by_distance((30, -1.445232759, 54.822020691))[0])
    # Sketch25 → Cut-Extrude21 (cut, up to the picked face)
    with BuildSketch(Plane(origin=(31.5, 0, 0), x_dir=(0, 0, -1), z_dir=(1, 0, 0)), mode=Mode.PRIVATE) as cut_extrude21_sk1:
        with Locations((-46.553400254, 6.659178135)):
            Rectangle(SKETCH25_W, SKETCH25_H)
    cut_extrude21_tool1 = split(extrude(cut_extrude21_sk1.sketch, amount=-CUT_EXTRUDE21_REACH, mode=Mode.PRIVATE), bisect_by=cut_extrude21_end, keep=Keep.BOTH, mode=Mode.PRIVATE)
    add(cut_extrude21_tool1.solids().sort_by(Axis((31.5, 6.659178, 46.5534), (-1, 0, 0)))[0], mode=Mode.SUBTRACT)

    # Sketch26 → Cut-Extrude22 (cut)
    with BuildSketch(Plane.XY.offset(65.701535197).offset(CUT_EXTRUDE22_START)):
        with Locations((10, -2.040821865)):
            Rectangle(SKETCH26_W, SKETCH26_H)
    extrude(amount=CUT_EXTRUDE22_DEPTH, mode=Mode.SUBTRACT)

    # Sketch27 → Cut-Extrude23 (cut)
    with BuildSketch(Plane(origin=(0, 0, 27.701535197), x_dir=(-1, 0, 0), z_dir=(0, 0, -1)).offset(CUT_EXTRUDE23_START)):
        with Locations((-20, -2.040821865)):
            Rectangle(SKETCH27_W, SKETCH27_H)
    extrude(amount=CUT_EXTRUDE23_DEPTH, mode=Mode.SUBTRACT)

    # Sketch28 → Cut-Extrude24 (cut)
    with BuildSketch(Plane(origin=(30, 0, 0), x_dir=(0, 0, -1), z_dir=(1, 0, 0))):
        with Locations((-55.201535197, -1.540821865)):
            Circle(SKETCH28_R)
        with Locations((-38.201535197, -1.540821865)):
            Circle(SKETCH28_R)
    extrude(amount=-CUT_EXTRUDE24_DEPTH, mode=Mode.SUBTRACT)

    # Cut-Extrude25: up to this face of the body (flat: up to its plane)
    cut_extrude25_end = Plane(part.part.faces().sort_by_distance((10.921875254, -9.040821865, 51.731547487))[0])
    # Sketch29 → Cut-Extrude25 (cut, up to the picked face)
    with BuildSketch(Plane(origin=(0, -4.440821865, 0), x_dir=(1, 0, 0), z_dir=(0, 1, 0)), mode=Mode.PRIVATE) as cut_extrude25_sk1:
        with Locations((14.05, -46.701535197)):
            Rectangle(SKETCH29_W, SKETCH29_H)
    cut_extrude25_tool1 = split(extrude(cut_extrude25_sk1.sketch, amount=-CUT_EXTRUDE25_REACH, mode=Mode.PRIVATE), bisect_by=cut_extrude25_end, keep=Keep.BOTH, mode=Mode.PRIVATE)
    add(cut_extrude25_tool1.solids().sort_by(Axis((14.05, -4.440822, 46.701535), (0, -1, 0)))[0], mode=Mode.SUBTRACT)

    # Cut-Extrude27: up to this face of the body (flat: up to its plane)
    cut_extrude27_end = Plane(part.part.faces().sort_by_distance((26.8, 2.175126911, 47.312469979))[0])
    # Sketch30 → Cut-Extrude27 (cut, up to the picked face)
    with BuildSketch(Plane.ZY, mode=Mode.PRIVATE) as cut_extrude27_sk1:
        with Locations((46.701535197, 0.059178135)):
            Rectangle(SKETCH30_W, SKETCH30_H)
    cut_extrude27_tool1 = split(extrude(cut_extrude27_sk1.sketch, amount=-CUT_EXTRUDE27_REACH, mode=Mode.PRIVATE), bisect_by=cut_extrude27_end, keep=Keep.BOTH, mode=Mode.PRIVATE)
    add(cut_extrude27_tool1.solids().sort_by(Axis((0, 0.059178, 46.701535), (1, 0, 0)))[0], mode=Mode.SUBTRACT)

    # Sketch32 → Cut-Extrude29 (cut)
    with BuildSketch(Plane(origin=(1, 0, 0), x_dir=(0, 0, -1), z_dir=(1, 0, 0))):
        Polygon((-32.701535197, 3.859178135), (-37.201535197, 3.859178135), (-37.201535197, 3.059178135), (-52.701535197, 3.059178135), (-52.701535197, 7.059178135), (-32.701535197, 7.059178135), align=None)
    extrude(amount=-CUT_EXTRUDE29_DEPTH, mode=Mode.SUBTRACT)

    # Sketch33 → Cut-Extrude30 (cut)
    with BuildSketch(Plane(origin=(0, -2.940821865, 0), x_dir=(1, 0, 0), z_dir=(0, 1, 0))):
        with Locations((13.9, -39.301535197)):
            Rectangle(SKETCH33_W, SKETCH33_H)
        with Locations((13.9, -54.101535197)):
            Rectangle(SKETCH33_W, SKETCH33_H)
    extrude(amount=-CUT_EXTRUDE30_DEPTH, mode=Mode.SUBTRACT)

    # Fillet2: read off the stored shape, not the designer's step
    # Fillet2 outline → Fillet2 (cut)
    with BuildSketch(Plane(origin=(0, 0, 0), x_dir=(1, 0, 0), z_dir=(0, 1, 0)).offset(FILLET2_START)):
        with BuildLine():
            ThreePointArc((16.9, -41.401535197), (15.839339828, -40.962195368), (15.4, -39.901535197))
            Line((15.4, -39.901535197), (15.4, -41.401535197))
            Line((15.4, -41.401535197), (16.9, -41.401535197))
        make_face()
        with BuildLine():
            Line((12.4, -41.401535197), (12.4, -39.901535197))
            ThreePointArc((12.4, -39.901535197), (11.960660172, -40.962195369), (10.9, -41.401535197))
            Line((10.9, -41.401535197), (12.4, -41.401535197))
        make_face()
        with BuildLine():
            ThreePointArc((10.9, -52.001535197), (11.960660172, -52.440875025), (12.4, -53.501535197))
            Line((12.4, -53.501535197), (12.4, -52.001535197))
            Line((12.4, -52.001535197), (10.9, -52.001535197))
        make_face()
        with BuildLine():
            Line((15.4, -52.001535197), (15.4, -53.501535197))
            ThreePointArc((15.4, -53.501535197), (15.839339828, -52.440875025), (16.9, -52.001535197))
            Line((16.9, -52.001535197), (15.4, -52.001535197))
        make_face()
    extrude(amount=FILLET2_DEPTH, mode=Mode.SUBTRACT)

    # Fillet2 2 outline → Fillet2 2 (add)
    with BuildSketch(Plane(origin=(0, 0, 0), x_dir=(1, 0, 0), z_dir=(0, 1, 0)).offset(FILLET2_START)):
        with BuildLine():
            ThreePointArc((12.4, -38.701535197), (12.839339828, -37.640875025), (13.9, -37.201535197))
            Line((13.9, -37.201535197), (12.4, -37.201535197))
            Line((12.4, -37.201535197), (12.4, -38.701535197))
        make_face()
        with BuildLine():
            ThreePointArc((13.9, -37.201535197), (14.960660172, -37.640875025), (15.4, -38.701535197))
            Line((15.4, -38.701535197), (15.4, -37.201535197))
            Line((15.4, -37.201535197), (13.9, -37.201535197))
        make_face()
        with BuildLine():
            ThreePointArc((15.4, -54.701535197), (14.960660172, -55.762195369), (13.9, -56.201535197))
            Line((13.9, -56.201535197), (15.4, -56.201535197))
            Line((15.4, -56.201535197), (15.4, -54.701535197))
        make_face()
        with BuildLine():
            ThreePointArc((13.9, -56.201535197), (12.839339828, -55.762195369), (12.4, -54.701535197))
            Line((12.4, -54.701535197), (12.4, -56.201535197))
            Line((12.4, -56.201535197), (13.9, -56.201535197))
        make_face()
    extrude(amount=FILLET2_2_DEPTH)


solid = part.part
